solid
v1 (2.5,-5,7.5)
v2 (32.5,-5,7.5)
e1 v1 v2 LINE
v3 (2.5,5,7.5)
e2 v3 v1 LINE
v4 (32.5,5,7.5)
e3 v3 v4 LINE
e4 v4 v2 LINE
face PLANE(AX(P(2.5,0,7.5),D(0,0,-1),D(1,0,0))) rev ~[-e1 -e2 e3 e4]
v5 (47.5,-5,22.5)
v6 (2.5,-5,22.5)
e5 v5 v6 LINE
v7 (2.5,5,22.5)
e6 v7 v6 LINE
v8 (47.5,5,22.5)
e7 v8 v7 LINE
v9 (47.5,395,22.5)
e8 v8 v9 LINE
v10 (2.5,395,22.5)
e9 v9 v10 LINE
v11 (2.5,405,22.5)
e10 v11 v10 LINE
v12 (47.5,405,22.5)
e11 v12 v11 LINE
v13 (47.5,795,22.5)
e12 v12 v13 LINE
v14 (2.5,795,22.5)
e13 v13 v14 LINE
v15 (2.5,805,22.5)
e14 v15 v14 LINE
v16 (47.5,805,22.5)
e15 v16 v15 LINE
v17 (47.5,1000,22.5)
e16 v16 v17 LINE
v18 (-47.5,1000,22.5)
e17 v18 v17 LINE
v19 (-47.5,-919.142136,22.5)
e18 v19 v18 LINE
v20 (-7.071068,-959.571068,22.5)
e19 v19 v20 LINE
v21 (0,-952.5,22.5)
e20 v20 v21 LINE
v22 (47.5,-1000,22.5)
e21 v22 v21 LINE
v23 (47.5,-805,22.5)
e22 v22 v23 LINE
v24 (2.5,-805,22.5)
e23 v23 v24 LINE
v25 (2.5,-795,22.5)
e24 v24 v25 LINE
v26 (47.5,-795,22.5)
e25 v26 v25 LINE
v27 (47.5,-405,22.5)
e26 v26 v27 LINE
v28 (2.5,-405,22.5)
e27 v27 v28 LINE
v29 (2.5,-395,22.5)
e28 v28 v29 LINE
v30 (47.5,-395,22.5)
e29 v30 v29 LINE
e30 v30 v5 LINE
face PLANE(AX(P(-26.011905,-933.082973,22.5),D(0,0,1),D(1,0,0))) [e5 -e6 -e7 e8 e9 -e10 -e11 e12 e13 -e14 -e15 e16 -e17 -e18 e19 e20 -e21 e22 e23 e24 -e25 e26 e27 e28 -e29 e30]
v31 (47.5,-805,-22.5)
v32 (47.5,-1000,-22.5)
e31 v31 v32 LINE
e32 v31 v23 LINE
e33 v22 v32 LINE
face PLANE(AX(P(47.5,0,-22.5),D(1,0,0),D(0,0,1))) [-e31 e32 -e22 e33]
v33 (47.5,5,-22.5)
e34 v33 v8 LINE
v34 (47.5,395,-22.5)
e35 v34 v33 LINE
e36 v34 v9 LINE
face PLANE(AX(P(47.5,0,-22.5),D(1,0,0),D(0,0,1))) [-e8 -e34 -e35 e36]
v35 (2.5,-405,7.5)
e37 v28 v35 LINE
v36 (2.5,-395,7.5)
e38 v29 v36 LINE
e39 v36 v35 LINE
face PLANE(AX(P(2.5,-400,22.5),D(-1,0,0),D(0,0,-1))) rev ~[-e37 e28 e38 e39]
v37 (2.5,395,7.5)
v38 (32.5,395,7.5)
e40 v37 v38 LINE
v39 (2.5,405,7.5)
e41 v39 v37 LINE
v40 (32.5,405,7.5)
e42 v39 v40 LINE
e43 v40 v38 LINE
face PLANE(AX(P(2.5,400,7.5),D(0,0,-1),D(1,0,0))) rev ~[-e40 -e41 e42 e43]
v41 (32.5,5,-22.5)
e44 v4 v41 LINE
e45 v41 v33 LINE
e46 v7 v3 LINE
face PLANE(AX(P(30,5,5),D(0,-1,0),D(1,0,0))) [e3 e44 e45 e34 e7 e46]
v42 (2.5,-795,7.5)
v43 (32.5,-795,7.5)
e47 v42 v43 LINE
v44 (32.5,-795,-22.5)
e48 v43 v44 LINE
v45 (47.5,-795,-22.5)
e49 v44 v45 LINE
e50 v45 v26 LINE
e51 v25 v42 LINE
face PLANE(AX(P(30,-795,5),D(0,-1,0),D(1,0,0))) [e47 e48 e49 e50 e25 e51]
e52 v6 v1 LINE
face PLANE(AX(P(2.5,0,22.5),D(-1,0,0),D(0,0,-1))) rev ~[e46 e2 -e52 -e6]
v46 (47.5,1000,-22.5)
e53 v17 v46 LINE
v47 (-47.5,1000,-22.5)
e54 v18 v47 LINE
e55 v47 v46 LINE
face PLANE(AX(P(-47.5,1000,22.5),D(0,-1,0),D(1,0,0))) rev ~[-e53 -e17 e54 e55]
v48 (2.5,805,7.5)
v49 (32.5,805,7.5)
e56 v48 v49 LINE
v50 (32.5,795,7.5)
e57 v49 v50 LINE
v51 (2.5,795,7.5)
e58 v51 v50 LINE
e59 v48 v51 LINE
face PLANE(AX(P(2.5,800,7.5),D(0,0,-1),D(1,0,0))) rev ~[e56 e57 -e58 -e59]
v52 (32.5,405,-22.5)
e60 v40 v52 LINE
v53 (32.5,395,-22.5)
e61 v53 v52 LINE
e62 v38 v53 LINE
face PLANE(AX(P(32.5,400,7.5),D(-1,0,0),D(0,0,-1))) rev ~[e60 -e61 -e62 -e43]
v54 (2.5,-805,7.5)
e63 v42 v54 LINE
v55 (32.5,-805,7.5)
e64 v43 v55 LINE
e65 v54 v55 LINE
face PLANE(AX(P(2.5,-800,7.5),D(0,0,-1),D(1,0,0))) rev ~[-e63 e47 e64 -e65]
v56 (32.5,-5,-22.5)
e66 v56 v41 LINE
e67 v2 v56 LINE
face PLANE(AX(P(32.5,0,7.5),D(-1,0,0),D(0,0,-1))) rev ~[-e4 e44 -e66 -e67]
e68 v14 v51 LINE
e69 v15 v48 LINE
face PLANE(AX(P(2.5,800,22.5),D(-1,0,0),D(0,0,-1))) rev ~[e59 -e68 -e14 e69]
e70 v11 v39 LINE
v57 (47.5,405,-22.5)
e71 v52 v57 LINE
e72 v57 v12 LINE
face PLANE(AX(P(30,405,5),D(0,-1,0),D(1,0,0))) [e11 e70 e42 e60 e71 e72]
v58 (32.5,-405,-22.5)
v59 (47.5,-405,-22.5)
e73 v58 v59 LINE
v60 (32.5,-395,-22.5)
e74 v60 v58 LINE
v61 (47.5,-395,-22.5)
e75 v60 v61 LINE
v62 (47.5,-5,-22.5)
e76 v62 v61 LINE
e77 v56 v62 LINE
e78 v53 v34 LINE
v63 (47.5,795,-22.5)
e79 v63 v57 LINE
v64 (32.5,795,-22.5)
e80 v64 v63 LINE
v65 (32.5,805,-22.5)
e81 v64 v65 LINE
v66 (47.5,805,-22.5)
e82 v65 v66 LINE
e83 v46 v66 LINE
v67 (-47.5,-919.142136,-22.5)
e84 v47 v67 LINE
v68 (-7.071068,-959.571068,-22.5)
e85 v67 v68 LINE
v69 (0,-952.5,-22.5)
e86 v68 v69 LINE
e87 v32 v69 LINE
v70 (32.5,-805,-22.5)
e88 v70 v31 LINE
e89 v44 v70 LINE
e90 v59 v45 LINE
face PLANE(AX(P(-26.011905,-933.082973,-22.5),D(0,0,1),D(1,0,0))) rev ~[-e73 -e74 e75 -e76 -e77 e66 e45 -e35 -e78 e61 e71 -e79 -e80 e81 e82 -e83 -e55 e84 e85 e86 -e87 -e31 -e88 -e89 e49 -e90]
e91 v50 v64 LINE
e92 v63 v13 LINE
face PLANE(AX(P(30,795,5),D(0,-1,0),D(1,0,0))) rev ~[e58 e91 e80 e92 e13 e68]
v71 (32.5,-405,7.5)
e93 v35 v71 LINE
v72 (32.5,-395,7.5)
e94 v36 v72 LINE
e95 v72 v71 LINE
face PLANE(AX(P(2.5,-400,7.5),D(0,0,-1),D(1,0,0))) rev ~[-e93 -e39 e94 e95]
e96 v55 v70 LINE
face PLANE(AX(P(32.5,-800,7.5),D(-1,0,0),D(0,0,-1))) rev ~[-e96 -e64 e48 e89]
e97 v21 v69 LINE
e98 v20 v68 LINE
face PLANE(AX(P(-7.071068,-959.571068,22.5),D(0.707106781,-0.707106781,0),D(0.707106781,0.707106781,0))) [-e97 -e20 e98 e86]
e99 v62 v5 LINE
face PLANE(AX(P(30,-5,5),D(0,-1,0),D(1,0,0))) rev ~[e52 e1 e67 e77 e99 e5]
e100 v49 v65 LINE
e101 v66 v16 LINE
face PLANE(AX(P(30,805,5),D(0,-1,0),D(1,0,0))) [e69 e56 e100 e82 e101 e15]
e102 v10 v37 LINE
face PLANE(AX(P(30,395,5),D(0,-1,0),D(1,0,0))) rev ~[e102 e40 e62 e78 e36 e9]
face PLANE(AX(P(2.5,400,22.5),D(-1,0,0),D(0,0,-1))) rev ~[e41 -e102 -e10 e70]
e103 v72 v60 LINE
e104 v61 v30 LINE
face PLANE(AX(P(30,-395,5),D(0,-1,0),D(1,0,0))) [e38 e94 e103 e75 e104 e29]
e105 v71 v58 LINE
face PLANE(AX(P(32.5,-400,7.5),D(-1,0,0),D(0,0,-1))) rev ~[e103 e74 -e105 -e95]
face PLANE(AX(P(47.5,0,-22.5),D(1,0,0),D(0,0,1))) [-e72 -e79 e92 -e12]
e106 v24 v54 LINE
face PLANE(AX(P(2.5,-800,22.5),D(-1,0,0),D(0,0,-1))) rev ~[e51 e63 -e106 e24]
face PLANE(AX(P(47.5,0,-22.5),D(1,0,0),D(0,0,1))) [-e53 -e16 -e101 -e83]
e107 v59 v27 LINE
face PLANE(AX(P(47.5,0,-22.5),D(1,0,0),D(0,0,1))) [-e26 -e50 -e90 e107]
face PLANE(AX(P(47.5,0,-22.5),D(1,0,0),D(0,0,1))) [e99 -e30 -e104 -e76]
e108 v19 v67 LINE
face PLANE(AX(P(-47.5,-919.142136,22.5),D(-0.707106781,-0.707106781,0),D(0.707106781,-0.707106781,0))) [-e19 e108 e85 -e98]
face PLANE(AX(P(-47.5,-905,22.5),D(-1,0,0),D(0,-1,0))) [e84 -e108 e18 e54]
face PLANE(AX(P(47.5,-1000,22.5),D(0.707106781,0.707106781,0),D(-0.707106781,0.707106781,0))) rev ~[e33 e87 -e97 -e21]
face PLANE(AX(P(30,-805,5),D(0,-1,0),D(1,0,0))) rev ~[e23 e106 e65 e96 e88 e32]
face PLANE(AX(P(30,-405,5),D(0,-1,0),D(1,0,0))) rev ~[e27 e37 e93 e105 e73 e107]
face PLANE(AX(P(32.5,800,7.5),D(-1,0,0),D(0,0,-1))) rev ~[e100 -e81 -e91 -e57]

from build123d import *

# Parameters (mm, degrees)
F0_W            = 95
F0_H            = 45
F1_DEPTH        = 1250
F2_W            = 95
F2_H            = 250
F3_DEPTH        = 45
F5_DEPTH        = 5
F5_COPIES_COUNT = 3
F5_COPIES_PITCH = 400
F8_DEPTH        = 5
F11_DEPTH       = 5
F13_DEPTH       = 45


# Not quite as in the source:
# - a pattern or mirror of a feature is missing from the dataset's text; its kind, count and spacing are read off the source's solid


with BuildPart() as f1:
    # F0 (on Front) → F1 (new body, symmetric)
    with BuildSketch(Plane.XZ):
        Rectangle(F0_W, F0_H)
    extrude(amount=F1_DEPTH, both=True)

    # F2 (on face) → F3 (cut, through all)
    with BuildSketch(Plane.XY.offset(22.5)):
        with Locations((0, 1125)):
            Rectangle(F2_W, F2_H)
        Polygon((47.5, -1250), (47.5, -1000), (-47.5, -905), (-47.5, -1250), align=None)
    extrude(amount=-F3_DEPTH, mode=Mode.SUBTRACT)

    # F4 (on Front) → F5 (cut, symmetric)
    with BuildSketch(Plane.XZ):
        Polygon((47.5, 22.5), (2.5, 22.5), (2.5, 7.5), (32.5, 7.5), (32.5, -22.5), (47.5, -22.5), align=None)
    f5 = extrude(amount=F5_DEPTH, both=True, mode=Mode.SUBTRACT)

    # F5_copies: F5 ×3
    with Locations(*[(0, i * F5_COPIES_PITCH, 0) for i in range(1, F5_COPIES_COUNT)]):
        add(f5, mode=Mode.SUBTRACT)

    # F7 (on offset) → F8 (cut, symmetric)
    with BuildSketch(Plane.XZ.offset(800)):
        Polygon((2.5, 22.5), (2.5, 7.5), (32.5, 7.5), (32.5, -22.5), (47.5, -22.5), (47.5, 22.5), align=None)
    extrude(amount=F8_DEPTH, both=True, mode=Mode.SUBTRACT)

    # F10 (on offset) → F11 (cut, symmetric)
    with BuildSketch(Plane.XZ.offset(400)):
        Polygon((2.5, 22.5), (2.5, 7.5), (32.5, 7.5), (32.5, -22.5), (47.5, -22.5), (47.5, 22.5), align=None)
    extrude(amount=F11_DEPTH, both=True, mode=Mode.SUBTRACT)

    # F12 (on face) → F13 (join, through all)
    with BuildSketch(Plane.XY.offset(22.5)):
        Polygon((0, -952.5), (-47.5, -905), (-47.5, -919.1421356237), (-7.0710678119, -959.5710678119), align=None)
    extrude(amount=-F13_DEPTH)


solid = f1.part
